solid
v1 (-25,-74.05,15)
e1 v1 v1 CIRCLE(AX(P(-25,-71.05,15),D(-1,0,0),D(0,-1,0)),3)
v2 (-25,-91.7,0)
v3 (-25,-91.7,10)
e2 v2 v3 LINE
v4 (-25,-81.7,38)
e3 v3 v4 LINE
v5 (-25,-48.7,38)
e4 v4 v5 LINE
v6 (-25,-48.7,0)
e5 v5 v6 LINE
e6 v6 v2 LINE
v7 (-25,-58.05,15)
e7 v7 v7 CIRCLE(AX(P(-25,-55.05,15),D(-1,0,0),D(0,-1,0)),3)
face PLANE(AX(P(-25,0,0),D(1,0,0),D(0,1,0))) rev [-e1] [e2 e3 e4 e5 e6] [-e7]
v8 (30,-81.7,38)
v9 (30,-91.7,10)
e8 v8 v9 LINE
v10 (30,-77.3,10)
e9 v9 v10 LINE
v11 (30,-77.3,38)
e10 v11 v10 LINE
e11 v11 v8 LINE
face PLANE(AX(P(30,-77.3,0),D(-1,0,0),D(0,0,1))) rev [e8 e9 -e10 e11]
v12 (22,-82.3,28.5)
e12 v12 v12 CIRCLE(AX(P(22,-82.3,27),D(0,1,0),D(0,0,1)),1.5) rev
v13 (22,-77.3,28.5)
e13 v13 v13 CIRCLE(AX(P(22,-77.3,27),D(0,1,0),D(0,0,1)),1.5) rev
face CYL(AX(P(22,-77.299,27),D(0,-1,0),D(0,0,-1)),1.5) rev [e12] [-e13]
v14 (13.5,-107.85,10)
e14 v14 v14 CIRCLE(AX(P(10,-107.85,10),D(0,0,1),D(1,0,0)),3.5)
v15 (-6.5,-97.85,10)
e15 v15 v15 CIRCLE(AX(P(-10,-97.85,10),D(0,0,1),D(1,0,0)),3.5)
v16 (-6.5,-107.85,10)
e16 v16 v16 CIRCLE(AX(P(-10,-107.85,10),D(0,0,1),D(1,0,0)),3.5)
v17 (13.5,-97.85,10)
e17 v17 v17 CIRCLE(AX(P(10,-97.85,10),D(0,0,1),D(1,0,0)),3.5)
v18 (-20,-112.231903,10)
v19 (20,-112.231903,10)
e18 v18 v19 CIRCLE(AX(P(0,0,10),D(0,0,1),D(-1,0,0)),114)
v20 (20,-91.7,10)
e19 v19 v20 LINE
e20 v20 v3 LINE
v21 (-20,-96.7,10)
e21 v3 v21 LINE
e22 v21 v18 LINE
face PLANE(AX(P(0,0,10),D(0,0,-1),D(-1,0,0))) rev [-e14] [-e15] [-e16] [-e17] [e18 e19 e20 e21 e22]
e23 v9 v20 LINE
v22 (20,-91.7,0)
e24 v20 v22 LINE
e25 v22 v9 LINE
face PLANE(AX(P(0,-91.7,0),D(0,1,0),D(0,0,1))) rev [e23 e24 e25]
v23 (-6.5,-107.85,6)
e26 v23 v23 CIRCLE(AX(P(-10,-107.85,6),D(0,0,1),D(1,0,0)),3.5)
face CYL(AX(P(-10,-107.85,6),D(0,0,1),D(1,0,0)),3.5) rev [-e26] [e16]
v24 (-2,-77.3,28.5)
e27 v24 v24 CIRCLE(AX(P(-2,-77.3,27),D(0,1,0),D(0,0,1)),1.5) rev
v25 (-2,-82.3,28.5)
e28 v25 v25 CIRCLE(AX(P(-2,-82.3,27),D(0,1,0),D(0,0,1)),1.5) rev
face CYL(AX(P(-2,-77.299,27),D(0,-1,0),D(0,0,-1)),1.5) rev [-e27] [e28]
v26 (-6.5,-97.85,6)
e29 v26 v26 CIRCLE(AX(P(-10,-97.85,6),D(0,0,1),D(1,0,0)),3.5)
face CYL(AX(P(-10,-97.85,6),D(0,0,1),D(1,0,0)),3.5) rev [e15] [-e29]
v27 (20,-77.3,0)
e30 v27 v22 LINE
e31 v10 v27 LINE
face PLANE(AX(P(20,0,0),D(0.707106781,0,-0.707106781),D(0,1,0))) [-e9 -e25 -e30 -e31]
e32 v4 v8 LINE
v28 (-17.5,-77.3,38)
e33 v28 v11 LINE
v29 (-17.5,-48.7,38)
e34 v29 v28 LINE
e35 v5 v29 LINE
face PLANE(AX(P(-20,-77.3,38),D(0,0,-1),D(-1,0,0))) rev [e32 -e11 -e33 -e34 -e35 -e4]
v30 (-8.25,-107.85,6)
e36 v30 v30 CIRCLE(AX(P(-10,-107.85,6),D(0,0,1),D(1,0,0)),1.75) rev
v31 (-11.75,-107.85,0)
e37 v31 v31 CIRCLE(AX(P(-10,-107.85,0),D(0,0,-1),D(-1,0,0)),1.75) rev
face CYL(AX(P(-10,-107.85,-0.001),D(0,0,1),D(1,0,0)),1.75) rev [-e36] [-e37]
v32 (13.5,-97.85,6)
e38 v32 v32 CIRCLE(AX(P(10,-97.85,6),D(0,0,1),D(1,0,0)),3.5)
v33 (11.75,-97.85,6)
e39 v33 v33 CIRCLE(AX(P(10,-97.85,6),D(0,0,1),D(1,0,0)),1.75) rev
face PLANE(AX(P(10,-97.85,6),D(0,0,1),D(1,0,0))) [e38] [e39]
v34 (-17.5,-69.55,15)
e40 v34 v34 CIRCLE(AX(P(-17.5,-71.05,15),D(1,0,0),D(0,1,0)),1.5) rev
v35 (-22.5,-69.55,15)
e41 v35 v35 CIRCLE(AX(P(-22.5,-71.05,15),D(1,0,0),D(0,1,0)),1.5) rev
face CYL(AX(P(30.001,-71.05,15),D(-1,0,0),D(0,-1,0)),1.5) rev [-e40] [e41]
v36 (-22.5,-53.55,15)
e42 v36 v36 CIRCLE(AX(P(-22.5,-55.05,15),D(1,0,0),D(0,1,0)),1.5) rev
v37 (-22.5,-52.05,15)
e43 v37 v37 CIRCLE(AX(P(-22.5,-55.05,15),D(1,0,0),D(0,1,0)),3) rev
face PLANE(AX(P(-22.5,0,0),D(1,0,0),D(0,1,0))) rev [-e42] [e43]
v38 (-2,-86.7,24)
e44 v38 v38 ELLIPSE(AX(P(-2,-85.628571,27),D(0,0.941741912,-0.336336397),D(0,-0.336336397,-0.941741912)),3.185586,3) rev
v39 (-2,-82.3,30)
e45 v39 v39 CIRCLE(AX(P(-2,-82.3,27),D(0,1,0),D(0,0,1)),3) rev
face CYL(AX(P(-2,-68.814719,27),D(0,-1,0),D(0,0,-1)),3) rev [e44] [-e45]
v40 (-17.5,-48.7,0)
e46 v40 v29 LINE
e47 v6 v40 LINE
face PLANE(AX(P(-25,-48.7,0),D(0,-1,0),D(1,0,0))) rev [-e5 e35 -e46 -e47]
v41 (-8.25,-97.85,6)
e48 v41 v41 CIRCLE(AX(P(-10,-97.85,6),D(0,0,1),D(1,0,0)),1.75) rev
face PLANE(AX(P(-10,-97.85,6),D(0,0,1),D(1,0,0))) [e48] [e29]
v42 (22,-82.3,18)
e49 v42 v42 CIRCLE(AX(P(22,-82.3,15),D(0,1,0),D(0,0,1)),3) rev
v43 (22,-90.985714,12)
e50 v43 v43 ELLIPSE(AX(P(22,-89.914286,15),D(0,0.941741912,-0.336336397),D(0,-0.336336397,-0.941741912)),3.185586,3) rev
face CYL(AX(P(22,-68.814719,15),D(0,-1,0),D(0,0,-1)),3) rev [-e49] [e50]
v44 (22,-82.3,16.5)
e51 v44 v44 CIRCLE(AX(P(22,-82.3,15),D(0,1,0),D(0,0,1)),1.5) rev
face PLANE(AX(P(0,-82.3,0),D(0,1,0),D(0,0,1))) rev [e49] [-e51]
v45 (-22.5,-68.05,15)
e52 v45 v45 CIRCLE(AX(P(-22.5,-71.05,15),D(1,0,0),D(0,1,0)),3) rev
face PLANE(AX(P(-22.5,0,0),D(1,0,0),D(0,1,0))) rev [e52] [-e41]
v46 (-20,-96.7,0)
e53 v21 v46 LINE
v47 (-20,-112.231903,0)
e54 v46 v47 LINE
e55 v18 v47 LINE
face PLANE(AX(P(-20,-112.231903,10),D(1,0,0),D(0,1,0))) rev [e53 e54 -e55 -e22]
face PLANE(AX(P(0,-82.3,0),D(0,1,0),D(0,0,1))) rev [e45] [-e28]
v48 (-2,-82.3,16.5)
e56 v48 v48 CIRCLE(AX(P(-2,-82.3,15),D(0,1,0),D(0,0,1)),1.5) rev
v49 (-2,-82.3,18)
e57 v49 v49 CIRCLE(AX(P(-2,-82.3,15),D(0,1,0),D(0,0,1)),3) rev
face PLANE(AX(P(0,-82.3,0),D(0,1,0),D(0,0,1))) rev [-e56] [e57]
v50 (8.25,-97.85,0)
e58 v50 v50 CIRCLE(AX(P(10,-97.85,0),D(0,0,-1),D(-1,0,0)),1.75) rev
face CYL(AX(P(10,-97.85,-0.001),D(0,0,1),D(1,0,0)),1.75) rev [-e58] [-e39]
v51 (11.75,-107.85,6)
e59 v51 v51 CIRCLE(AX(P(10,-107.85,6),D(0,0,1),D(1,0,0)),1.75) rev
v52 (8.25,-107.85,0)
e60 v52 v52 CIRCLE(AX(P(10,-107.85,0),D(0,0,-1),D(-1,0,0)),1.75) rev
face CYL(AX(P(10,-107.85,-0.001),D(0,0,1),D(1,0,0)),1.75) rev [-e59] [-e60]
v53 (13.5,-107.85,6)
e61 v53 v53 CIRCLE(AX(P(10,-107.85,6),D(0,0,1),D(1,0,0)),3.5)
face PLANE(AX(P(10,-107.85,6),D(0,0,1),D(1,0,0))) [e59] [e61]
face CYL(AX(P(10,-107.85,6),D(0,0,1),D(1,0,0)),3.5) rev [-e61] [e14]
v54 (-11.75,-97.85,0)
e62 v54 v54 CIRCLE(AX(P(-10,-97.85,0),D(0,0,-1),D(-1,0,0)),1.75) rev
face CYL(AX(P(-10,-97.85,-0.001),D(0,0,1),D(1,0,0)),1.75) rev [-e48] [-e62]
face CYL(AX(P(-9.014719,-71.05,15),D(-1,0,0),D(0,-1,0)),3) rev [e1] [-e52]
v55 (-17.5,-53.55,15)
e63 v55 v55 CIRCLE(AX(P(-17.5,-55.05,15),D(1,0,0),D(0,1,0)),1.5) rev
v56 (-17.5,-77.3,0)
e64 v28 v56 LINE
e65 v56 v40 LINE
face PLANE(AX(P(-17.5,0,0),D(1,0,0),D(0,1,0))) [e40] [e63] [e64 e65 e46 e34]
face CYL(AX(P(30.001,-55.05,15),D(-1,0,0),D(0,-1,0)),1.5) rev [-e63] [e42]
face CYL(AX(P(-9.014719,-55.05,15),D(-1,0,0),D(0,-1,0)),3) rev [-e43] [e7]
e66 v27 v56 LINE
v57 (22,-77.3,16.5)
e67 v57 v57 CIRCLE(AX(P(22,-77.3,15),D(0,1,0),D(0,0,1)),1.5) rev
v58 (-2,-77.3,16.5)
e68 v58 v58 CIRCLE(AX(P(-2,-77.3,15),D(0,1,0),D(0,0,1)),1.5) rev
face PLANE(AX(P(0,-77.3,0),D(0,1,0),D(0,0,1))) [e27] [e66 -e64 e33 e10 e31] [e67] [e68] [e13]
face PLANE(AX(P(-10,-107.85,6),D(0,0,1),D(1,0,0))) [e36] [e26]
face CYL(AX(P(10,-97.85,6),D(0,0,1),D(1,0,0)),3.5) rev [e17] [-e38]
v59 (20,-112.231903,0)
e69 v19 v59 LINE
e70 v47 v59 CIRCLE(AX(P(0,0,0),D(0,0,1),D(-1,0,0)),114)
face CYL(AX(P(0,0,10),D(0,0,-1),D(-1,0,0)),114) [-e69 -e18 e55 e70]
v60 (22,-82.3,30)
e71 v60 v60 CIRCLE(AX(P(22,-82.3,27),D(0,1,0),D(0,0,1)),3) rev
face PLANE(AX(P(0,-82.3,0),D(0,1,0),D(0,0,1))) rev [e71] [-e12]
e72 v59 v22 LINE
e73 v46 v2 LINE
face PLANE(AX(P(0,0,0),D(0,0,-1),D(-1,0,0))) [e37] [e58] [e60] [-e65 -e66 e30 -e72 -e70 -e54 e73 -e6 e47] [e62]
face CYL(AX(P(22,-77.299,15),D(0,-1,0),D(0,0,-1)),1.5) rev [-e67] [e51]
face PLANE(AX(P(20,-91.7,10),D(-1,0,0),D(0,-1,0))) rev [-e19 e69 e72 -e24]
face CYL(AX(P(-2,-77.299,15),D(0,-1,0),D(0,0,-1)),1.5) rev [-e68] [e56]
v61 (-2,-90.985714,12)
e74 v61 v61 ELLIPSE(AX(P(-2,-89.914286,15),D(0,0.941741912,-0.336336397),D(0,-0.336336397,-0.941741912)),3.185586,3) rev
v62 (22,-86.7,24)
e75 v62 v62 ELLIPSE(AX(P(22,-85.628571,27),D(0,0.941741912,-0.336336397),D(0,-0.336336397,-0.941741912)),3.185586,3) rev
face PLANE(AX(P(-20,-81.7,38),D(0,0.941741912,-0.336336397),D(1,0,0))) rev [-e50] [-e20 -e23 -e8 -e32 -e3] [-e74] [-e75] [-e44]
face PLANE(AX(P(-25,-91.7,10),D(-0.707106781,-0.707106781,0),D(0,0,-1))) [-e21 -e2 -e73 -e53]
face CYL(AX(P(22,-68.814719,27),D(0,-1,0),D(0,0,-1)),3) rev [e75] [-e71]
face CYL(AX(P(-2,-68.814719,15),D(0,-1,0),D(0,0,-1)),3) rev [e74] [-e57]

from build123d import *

# Parameters (mm, degrees)
BOSS_EXTRU_1_DEPTH      = 10
ENL_V_MAT_EXTRU_1_REACH = 118.172
ESQUISSE2_R             = 1.75
ESQUISSE4_R             = 3.5
ENL_V_MAT_EXTRU_2_DEPTH = 4
ESQUISSE5_W             = 50
ESQUISSE5_H             = 38
BOSS_EXTRU_2_DEPTH      = 14.4
ENL_V_MAT_EXTRU_3_REACH = 55.304
ESQUISSE6_R             = 1.5
ESQUISSE7_R             = 3
ENL_V_MAT_EXTRU_4_DEPTH = 9.4
CHANFREIN1_SIZE         = 10
CHANFREIN2_SIZE         = 28
CHANFREIN2_SIZE_2       = 10
BOSS_EXTRU_3_DEPTH      = 5
ESQUISSE9_W             = 38
ESQUISSE9_H             = 28.6
BOSS_EXTRU_4_DEPTH      = 2.5
CHANFREIN3_SIZE         = 5
ENL_V_MAT_EXTRU_5_REACH = 134.155
ESQUISSE10_R            = 1.5
ESQUISSE11_R            = 3
ENL_V_MAT_EXTRU_6_DEPTH = 2.5


# Some blends are built 0.0001 mm under size
with BuildPart() as part:
    # Esquisse1 → Boss.-Extru.1 (new body)
    with BuildSketch(Plane.XY):
        with BuildLine():
            Line((-20, -112.231902773), (-20, -91.7))
            Line((-20, -91.7), (20, -91.7))
            Line((20, -91.7), (20, -112.231902773))
            ThreePointArc((20, -112.231902773), (0, -114), (-20, -112.231902773))
        make_face()
    extrude(amount=BOSS_EXTRU_1_DEPTH)

    # Esquisse2 → Enlèv. mat.-Extru.1 (cut, up to next)
    with BuildSketch(Plane.XY.offset(10), mode=Mode.PRIVATE) as enl_v_mat_extru_1_sk1:
        with Locations((-10, -97.85)):
            Circle(ESQUISSE2_R)
    enl_v_mat_extru_1_tool1 = extrude(enl_v_mat_extru_1_sk1.sketch, amount=-ENL_V_MAT_EXTRU_1_REACH, mode=Mode.PRIVATE) & part.part
    # Esquisse2 → Enlèv. mat.-Extru.1 (cut, up to next)
    with BuildSketch(Plane.XY.offset(10), mode=Mode.PRIVATE) as enl_v_mat_extru_1_sk2:
        with Locations((-10, -107.85)):
            Circle(ESQUISSE2_R)
    enl_v_mat_extru_1_tool2 = extrude(enl_v_mat_extru_1_sk2.sketch, amount=-ENL_V_MAT_EXTRU_1_REACH, mode=Mode.PRIVATE) & part.part
    # Esquisse2 → Enlèv. mat.-Extru.1 (cut, up to next)
    with BuildSketch(Plane.XY.offset(10), mode=Mode.PRIVATE) as enl_v_mat_extru_1_sk3:
        with Locations((10, -97.85)):
            Circle(ESQUISSE2_R)
    enl_v_mat_extru_1_tool3 = extrude(enl_v_mat_extru_1_sk3.sketch, amount=-ENL_V_MAT_EXTRU_1_REACH, mode=Mode.PRIVATE) & part.part
    # Esquisse2 → Enlèv. mat.-Extru.1 (cut, up to next)
    with BuildSketch(Plane.XY.offset(10), mode=Mode.PRIVATE) as enl_v_mat_extru_1_sk4:
        with Locations((10, -107.85)):
            Circle(ESQUISSE2_R)
    enl_v_mat_extru_1_tool4 = extrude(enl_v_mat_extru_1_sk4.sketch, amount=-ENL_V_MAT_EXTRU_1_REACH, mode=Mode.PRIVATE) & part.part
    add(enl_v_mat_extru_1_tool1.solids().sort_by_distance((-10, -97.85, 10))[0], mode=Mode.SUBTRACT)
    add(enl_v_mat_extru_1_tool2.solids().sort_by_distance((-10, -107.85, 10))[0], mode=Mode.SUBTRACT)
    add(enl_v_mat_extru_1_tool3.solids().sort_by_distance((10, -97.85, 10))[0], mode=Mode.SUBTRACT)
    add(enl_v_mat_extru_1_tool4.solids().sort_by_distance((10, -107.85, 10))[0], mode=Mode.SUBTRACT)

    # Esquisse4 → Enlèv. mat.-Extru.2 (cut)
    with BuildSketch(Plane.XY.offset(10)):
        with Locations((-10, -97.85)):
            Circle(ESQUISSE4_R)
        with Locations((10, -97.85)):
            Circle(ESQUISSE4_R)
        with Locations((10, -107.85)):
            Circle(ESQUISSE4_R)
        with Locations((-10, -107.85)):
            Circle(ESQUISSE4_R)
    extrude(amount=-ENL_V_MAT_EXTRU_2_DEPTH, mode=Mode.SUBTRACT)

    # Esquisse5 → Boss.-Extru.2 (add)
    with BuildSketch(Plane(origin=(0, -91.7, 0), x_dir=(1, 0, 0), z_dir=(0, 1, 0))):
        with Locations((5, -19)):
            Rectangle(ESQUISSE5_W, ESQUISSE5_H)
    extrude(amount=BOSS_EXTRU_2_DEPTH)

    # Esquisse6 → Enlèv. mat.-Extru.3 (cut, up to next)
    with BuildSketch(Plane.XZ.offset(91.7), mode=Mode.PRIVATE) as enl_v_mat_extru_3_sk1:
        with Locations(Location((-2, 27, 0), (0, 0, 270))):
            Circle(ESQUISSE6_R)
    enl_v_mat_extru_3_tool1 = extrude(enl_v_mat_extru_3_sk1.sketch, amount=-ENL_V_MAT_EXTRU_3_REACH, mode=Mode.PRIVATE) & part.part
    # Esquisse6 → Enlèv. mat.-Extru.3 (cut, up to next)
    with BuildSketch(Plane.XZ.offset(91.7), mode=Mode.PRIVATE) as enl_v_mat_extru_3_sk2:
        with Locations(Location((22, 27, 0), (0, 0, 270))):
            Circle(ESQUISSE6_R)
    enl_v_mat_extru_3_tool2 = extrude(enl_v_mat_extru_3_sk2.sketch, amount=-ENL_V_MAT_EXTRU_3_REACH, mode=Mode.PRIVATE) & part.part
    # Esquisse6 → Enlèv. mat.-Extru.3 (cut, up to next)
    with BuildSketch(Plane.XZ.offset(91.7), mode=Mode.PRIVATE) as enl_v_mat_extru_3_sk3:
        with Locations(Location((-2, 15, 0), (0, 0, 270))):
            Circle(ESQUISSE6_R)
    enl_v_mat_extru_3_tool3 = extrude(enl_v_mat_extru_3_sk3.sketch, amount=-ENL_V_MAT_EXTRU_3_REACH, mode=Mode.PRIVATE) & part.part
    # Esquisse6 → Enlèv. mat.-Extru.3 (cut, up to next)
    with BuildSketch(Plane.XZ.offset(91.7), mode=Mode.PRIVATE) as enl_v_mat_extru_3_sk4:
        with Locations(Location((22, 15, 0), (0, 0, 270))):
            Circle(ESQUISSE6_R)
    enl_v_mat_extru_3_tool4 = extrude(enl_v_mat_extru_3_sk4.sketch, amount=-ENL_V_MAT_EXTRU_3_REACH, mode=Mode.PRIVATE) & part.part
    add(enl_v_mat_extru_3_tool1.solids().sort_by_distance((-2, -91.7, 27))[0], mode=Mode.SUBTRACT)
    add(enl_v_mat_extru_3_tool2.solids().sort_by_distance((22, -91.7, 27))[0], mode=Mode.SUBTRACT)
    add(enl_v_mat_extru_3_tool3.solids().sort_by_distance((-2, -91.7, 15))[0], mode=Mode.SUBTRACT)
    add(enl_v_mat_extru_3_tool4.solids().sort_by_distance((22, -91.7, 15))[0], mode=Mode.SUBTRACT)

    # Esquisse7 → Enlèv. mat.-Extru.4 (cut)
    with BuildSketch(Plane.XZ.offset(91.7)):
        with Locations(Location((-2, 27, 0), (0, 0, 270))):
            Circle(ESQUISSE7_R)
        with Locations(Location((22, 27, 0), (0, 0, 270))):
            Circle(ESQUISSE7_R)
        with Locations(Location((22, 15, 0), (0, 0, 270))):
            Circle(ESQUISSE7_R)
        with Locations(Location((-2, 15, 0), (0, 0, 270))):
            Circle(ESQUISSE7_R)
    extrude(amount=-ENL_V_MAT_EXTRU_4_DEPTH, mode=Mode.SUBTRACT)

    # Chanfrein1
    chanfrein1_edges = [part.edges().sort_by_distance(p)[0] for p in [
        (30, -84.5, 0),
    ]]
    chamfer(chanfrein1_edges, length=CHANFREIN1_SIZE)

    # Chanfrein2
    # the kernel refuses this chamfer: 28, 10 mm, written as the material it takes off along each edge
    with BuildSketch(Plane(origin=(102.642981969, -91.7, 38), x_dir=(0, -0.01296397650632004, -0.9999159641255577), z_dir=(-1, 0, 0))) as chanfrein2_piece_1:
        Polygon((CHANFREIN2_SIZE * 0.999915964126, -CHANFREIN2_SIZE * 0.0129639765063), (-CHANFREIN2_SIZE_2 * 0.0129639765063, -CHANFREIN2_SIZE_2 * 0.999915964126), (0, 0), align=None)
    extrude(amount=195.285963938, mode=Mode.SUBTRACT)

    # Esquisse8 → Boss.-Extru.3 (add)
    with BuildSketch(Plane.ZY.offset(20)):
        Polygon((10, -91.7), (0, -91.7), (0, -48.7), (38, -48.7), (38, -81.7), align=None)
    extrude(amount=BOSS_EXTRU_3_DEPTH)

    # Esquisse9 → Boss.-Extru.4 (add)
    with BuildSketch(Plane(origin=(-20, 0, 0), x_dir=(0, 0, -1), z_dir=(1, 0, 0))):
        with Locations((-19, -63)):
            Rectangle(ESQUISSE9_W, ESQUISSE9_H)
    extrude(amount=BOSS_EXTRU_4_DEPTH)

    # Chanfrein3
    chanfrein3_edges = [part.edges().sort_by_distance(p)[0] for p in [
        (-20, -91.7, 5),
    ]]
    chamfer(chanfrein3_edges, length=CHANFREIN3_SIZE - 0.0001)  # a hair under: the kernel refuses the full size

    # Esquisse10 → Enlèv. mat.-Extru.5 (cut, up to next)
    with BuildSketch(Plane.ZY.offset(25), mode=Mode.PRIVATE) as enl_v_mat_extru_5_sk1:
        with Locations(Location((15, -55.05, 0), (0, 0, 270))):
            Circle(ESQUISSE10_R)
    enl_v_mat_extru_5_tool1 = extrude(enl_v_mat_extru_5_sk1.sketch, amount=-ENL_V_MAT_EXTRU_5_REACH, mode=Mode.PRIVATE) & part.part
    # Esquisse10 → Enlèv. mat.-Extru.5 (cut, up to next)
    with BuildSketch(Plane.ZY.offset(25), mode=Mode.PRIVATE) as enl_v_mat_extru_5_sk2:
        with Locations(Location((15, -71.05, 0), (0, 0, 270))):
            Circle(ESQUISSE10_R)
    enl_v_mat_extru_5_tool2 = extrude(enl_v_mat_extru_5_sk2.sketch, amount=-ENL_V_MAT_EXTRU_5_REACH, mode=Mode.PRIVATE) & part.part
    add(enl_v_mat_extru_5_tool1.solids().sort_by_distance((-25, -55.05, 15))[0], mode=Mode.SUBTRACT)
    add(enl_v_mat_extru_5_tool2.solids().sort_by_distance((-25, -71.05, 15))[0], mode=Mode.SUBTRACT)

    # Esquisse11 → Enlèv. mat.-Extru.6 (cut)
    with BuildSketch(Plane.ZY.offset(25)):
        with Locations(Location((15, -55.05, 0), (0, 0, 270))):
            Circle(ESQUISSE11_R)
        with Locations(Location((15, -71.05, 0), (0, 0, 270))):
            Circle(ESQUISSE11_R)
    extrude(amount=-ENL_V_MAT_EXTRU_6_DEPTH, mode=Mode.SUBTRACT)


solid = part.part
